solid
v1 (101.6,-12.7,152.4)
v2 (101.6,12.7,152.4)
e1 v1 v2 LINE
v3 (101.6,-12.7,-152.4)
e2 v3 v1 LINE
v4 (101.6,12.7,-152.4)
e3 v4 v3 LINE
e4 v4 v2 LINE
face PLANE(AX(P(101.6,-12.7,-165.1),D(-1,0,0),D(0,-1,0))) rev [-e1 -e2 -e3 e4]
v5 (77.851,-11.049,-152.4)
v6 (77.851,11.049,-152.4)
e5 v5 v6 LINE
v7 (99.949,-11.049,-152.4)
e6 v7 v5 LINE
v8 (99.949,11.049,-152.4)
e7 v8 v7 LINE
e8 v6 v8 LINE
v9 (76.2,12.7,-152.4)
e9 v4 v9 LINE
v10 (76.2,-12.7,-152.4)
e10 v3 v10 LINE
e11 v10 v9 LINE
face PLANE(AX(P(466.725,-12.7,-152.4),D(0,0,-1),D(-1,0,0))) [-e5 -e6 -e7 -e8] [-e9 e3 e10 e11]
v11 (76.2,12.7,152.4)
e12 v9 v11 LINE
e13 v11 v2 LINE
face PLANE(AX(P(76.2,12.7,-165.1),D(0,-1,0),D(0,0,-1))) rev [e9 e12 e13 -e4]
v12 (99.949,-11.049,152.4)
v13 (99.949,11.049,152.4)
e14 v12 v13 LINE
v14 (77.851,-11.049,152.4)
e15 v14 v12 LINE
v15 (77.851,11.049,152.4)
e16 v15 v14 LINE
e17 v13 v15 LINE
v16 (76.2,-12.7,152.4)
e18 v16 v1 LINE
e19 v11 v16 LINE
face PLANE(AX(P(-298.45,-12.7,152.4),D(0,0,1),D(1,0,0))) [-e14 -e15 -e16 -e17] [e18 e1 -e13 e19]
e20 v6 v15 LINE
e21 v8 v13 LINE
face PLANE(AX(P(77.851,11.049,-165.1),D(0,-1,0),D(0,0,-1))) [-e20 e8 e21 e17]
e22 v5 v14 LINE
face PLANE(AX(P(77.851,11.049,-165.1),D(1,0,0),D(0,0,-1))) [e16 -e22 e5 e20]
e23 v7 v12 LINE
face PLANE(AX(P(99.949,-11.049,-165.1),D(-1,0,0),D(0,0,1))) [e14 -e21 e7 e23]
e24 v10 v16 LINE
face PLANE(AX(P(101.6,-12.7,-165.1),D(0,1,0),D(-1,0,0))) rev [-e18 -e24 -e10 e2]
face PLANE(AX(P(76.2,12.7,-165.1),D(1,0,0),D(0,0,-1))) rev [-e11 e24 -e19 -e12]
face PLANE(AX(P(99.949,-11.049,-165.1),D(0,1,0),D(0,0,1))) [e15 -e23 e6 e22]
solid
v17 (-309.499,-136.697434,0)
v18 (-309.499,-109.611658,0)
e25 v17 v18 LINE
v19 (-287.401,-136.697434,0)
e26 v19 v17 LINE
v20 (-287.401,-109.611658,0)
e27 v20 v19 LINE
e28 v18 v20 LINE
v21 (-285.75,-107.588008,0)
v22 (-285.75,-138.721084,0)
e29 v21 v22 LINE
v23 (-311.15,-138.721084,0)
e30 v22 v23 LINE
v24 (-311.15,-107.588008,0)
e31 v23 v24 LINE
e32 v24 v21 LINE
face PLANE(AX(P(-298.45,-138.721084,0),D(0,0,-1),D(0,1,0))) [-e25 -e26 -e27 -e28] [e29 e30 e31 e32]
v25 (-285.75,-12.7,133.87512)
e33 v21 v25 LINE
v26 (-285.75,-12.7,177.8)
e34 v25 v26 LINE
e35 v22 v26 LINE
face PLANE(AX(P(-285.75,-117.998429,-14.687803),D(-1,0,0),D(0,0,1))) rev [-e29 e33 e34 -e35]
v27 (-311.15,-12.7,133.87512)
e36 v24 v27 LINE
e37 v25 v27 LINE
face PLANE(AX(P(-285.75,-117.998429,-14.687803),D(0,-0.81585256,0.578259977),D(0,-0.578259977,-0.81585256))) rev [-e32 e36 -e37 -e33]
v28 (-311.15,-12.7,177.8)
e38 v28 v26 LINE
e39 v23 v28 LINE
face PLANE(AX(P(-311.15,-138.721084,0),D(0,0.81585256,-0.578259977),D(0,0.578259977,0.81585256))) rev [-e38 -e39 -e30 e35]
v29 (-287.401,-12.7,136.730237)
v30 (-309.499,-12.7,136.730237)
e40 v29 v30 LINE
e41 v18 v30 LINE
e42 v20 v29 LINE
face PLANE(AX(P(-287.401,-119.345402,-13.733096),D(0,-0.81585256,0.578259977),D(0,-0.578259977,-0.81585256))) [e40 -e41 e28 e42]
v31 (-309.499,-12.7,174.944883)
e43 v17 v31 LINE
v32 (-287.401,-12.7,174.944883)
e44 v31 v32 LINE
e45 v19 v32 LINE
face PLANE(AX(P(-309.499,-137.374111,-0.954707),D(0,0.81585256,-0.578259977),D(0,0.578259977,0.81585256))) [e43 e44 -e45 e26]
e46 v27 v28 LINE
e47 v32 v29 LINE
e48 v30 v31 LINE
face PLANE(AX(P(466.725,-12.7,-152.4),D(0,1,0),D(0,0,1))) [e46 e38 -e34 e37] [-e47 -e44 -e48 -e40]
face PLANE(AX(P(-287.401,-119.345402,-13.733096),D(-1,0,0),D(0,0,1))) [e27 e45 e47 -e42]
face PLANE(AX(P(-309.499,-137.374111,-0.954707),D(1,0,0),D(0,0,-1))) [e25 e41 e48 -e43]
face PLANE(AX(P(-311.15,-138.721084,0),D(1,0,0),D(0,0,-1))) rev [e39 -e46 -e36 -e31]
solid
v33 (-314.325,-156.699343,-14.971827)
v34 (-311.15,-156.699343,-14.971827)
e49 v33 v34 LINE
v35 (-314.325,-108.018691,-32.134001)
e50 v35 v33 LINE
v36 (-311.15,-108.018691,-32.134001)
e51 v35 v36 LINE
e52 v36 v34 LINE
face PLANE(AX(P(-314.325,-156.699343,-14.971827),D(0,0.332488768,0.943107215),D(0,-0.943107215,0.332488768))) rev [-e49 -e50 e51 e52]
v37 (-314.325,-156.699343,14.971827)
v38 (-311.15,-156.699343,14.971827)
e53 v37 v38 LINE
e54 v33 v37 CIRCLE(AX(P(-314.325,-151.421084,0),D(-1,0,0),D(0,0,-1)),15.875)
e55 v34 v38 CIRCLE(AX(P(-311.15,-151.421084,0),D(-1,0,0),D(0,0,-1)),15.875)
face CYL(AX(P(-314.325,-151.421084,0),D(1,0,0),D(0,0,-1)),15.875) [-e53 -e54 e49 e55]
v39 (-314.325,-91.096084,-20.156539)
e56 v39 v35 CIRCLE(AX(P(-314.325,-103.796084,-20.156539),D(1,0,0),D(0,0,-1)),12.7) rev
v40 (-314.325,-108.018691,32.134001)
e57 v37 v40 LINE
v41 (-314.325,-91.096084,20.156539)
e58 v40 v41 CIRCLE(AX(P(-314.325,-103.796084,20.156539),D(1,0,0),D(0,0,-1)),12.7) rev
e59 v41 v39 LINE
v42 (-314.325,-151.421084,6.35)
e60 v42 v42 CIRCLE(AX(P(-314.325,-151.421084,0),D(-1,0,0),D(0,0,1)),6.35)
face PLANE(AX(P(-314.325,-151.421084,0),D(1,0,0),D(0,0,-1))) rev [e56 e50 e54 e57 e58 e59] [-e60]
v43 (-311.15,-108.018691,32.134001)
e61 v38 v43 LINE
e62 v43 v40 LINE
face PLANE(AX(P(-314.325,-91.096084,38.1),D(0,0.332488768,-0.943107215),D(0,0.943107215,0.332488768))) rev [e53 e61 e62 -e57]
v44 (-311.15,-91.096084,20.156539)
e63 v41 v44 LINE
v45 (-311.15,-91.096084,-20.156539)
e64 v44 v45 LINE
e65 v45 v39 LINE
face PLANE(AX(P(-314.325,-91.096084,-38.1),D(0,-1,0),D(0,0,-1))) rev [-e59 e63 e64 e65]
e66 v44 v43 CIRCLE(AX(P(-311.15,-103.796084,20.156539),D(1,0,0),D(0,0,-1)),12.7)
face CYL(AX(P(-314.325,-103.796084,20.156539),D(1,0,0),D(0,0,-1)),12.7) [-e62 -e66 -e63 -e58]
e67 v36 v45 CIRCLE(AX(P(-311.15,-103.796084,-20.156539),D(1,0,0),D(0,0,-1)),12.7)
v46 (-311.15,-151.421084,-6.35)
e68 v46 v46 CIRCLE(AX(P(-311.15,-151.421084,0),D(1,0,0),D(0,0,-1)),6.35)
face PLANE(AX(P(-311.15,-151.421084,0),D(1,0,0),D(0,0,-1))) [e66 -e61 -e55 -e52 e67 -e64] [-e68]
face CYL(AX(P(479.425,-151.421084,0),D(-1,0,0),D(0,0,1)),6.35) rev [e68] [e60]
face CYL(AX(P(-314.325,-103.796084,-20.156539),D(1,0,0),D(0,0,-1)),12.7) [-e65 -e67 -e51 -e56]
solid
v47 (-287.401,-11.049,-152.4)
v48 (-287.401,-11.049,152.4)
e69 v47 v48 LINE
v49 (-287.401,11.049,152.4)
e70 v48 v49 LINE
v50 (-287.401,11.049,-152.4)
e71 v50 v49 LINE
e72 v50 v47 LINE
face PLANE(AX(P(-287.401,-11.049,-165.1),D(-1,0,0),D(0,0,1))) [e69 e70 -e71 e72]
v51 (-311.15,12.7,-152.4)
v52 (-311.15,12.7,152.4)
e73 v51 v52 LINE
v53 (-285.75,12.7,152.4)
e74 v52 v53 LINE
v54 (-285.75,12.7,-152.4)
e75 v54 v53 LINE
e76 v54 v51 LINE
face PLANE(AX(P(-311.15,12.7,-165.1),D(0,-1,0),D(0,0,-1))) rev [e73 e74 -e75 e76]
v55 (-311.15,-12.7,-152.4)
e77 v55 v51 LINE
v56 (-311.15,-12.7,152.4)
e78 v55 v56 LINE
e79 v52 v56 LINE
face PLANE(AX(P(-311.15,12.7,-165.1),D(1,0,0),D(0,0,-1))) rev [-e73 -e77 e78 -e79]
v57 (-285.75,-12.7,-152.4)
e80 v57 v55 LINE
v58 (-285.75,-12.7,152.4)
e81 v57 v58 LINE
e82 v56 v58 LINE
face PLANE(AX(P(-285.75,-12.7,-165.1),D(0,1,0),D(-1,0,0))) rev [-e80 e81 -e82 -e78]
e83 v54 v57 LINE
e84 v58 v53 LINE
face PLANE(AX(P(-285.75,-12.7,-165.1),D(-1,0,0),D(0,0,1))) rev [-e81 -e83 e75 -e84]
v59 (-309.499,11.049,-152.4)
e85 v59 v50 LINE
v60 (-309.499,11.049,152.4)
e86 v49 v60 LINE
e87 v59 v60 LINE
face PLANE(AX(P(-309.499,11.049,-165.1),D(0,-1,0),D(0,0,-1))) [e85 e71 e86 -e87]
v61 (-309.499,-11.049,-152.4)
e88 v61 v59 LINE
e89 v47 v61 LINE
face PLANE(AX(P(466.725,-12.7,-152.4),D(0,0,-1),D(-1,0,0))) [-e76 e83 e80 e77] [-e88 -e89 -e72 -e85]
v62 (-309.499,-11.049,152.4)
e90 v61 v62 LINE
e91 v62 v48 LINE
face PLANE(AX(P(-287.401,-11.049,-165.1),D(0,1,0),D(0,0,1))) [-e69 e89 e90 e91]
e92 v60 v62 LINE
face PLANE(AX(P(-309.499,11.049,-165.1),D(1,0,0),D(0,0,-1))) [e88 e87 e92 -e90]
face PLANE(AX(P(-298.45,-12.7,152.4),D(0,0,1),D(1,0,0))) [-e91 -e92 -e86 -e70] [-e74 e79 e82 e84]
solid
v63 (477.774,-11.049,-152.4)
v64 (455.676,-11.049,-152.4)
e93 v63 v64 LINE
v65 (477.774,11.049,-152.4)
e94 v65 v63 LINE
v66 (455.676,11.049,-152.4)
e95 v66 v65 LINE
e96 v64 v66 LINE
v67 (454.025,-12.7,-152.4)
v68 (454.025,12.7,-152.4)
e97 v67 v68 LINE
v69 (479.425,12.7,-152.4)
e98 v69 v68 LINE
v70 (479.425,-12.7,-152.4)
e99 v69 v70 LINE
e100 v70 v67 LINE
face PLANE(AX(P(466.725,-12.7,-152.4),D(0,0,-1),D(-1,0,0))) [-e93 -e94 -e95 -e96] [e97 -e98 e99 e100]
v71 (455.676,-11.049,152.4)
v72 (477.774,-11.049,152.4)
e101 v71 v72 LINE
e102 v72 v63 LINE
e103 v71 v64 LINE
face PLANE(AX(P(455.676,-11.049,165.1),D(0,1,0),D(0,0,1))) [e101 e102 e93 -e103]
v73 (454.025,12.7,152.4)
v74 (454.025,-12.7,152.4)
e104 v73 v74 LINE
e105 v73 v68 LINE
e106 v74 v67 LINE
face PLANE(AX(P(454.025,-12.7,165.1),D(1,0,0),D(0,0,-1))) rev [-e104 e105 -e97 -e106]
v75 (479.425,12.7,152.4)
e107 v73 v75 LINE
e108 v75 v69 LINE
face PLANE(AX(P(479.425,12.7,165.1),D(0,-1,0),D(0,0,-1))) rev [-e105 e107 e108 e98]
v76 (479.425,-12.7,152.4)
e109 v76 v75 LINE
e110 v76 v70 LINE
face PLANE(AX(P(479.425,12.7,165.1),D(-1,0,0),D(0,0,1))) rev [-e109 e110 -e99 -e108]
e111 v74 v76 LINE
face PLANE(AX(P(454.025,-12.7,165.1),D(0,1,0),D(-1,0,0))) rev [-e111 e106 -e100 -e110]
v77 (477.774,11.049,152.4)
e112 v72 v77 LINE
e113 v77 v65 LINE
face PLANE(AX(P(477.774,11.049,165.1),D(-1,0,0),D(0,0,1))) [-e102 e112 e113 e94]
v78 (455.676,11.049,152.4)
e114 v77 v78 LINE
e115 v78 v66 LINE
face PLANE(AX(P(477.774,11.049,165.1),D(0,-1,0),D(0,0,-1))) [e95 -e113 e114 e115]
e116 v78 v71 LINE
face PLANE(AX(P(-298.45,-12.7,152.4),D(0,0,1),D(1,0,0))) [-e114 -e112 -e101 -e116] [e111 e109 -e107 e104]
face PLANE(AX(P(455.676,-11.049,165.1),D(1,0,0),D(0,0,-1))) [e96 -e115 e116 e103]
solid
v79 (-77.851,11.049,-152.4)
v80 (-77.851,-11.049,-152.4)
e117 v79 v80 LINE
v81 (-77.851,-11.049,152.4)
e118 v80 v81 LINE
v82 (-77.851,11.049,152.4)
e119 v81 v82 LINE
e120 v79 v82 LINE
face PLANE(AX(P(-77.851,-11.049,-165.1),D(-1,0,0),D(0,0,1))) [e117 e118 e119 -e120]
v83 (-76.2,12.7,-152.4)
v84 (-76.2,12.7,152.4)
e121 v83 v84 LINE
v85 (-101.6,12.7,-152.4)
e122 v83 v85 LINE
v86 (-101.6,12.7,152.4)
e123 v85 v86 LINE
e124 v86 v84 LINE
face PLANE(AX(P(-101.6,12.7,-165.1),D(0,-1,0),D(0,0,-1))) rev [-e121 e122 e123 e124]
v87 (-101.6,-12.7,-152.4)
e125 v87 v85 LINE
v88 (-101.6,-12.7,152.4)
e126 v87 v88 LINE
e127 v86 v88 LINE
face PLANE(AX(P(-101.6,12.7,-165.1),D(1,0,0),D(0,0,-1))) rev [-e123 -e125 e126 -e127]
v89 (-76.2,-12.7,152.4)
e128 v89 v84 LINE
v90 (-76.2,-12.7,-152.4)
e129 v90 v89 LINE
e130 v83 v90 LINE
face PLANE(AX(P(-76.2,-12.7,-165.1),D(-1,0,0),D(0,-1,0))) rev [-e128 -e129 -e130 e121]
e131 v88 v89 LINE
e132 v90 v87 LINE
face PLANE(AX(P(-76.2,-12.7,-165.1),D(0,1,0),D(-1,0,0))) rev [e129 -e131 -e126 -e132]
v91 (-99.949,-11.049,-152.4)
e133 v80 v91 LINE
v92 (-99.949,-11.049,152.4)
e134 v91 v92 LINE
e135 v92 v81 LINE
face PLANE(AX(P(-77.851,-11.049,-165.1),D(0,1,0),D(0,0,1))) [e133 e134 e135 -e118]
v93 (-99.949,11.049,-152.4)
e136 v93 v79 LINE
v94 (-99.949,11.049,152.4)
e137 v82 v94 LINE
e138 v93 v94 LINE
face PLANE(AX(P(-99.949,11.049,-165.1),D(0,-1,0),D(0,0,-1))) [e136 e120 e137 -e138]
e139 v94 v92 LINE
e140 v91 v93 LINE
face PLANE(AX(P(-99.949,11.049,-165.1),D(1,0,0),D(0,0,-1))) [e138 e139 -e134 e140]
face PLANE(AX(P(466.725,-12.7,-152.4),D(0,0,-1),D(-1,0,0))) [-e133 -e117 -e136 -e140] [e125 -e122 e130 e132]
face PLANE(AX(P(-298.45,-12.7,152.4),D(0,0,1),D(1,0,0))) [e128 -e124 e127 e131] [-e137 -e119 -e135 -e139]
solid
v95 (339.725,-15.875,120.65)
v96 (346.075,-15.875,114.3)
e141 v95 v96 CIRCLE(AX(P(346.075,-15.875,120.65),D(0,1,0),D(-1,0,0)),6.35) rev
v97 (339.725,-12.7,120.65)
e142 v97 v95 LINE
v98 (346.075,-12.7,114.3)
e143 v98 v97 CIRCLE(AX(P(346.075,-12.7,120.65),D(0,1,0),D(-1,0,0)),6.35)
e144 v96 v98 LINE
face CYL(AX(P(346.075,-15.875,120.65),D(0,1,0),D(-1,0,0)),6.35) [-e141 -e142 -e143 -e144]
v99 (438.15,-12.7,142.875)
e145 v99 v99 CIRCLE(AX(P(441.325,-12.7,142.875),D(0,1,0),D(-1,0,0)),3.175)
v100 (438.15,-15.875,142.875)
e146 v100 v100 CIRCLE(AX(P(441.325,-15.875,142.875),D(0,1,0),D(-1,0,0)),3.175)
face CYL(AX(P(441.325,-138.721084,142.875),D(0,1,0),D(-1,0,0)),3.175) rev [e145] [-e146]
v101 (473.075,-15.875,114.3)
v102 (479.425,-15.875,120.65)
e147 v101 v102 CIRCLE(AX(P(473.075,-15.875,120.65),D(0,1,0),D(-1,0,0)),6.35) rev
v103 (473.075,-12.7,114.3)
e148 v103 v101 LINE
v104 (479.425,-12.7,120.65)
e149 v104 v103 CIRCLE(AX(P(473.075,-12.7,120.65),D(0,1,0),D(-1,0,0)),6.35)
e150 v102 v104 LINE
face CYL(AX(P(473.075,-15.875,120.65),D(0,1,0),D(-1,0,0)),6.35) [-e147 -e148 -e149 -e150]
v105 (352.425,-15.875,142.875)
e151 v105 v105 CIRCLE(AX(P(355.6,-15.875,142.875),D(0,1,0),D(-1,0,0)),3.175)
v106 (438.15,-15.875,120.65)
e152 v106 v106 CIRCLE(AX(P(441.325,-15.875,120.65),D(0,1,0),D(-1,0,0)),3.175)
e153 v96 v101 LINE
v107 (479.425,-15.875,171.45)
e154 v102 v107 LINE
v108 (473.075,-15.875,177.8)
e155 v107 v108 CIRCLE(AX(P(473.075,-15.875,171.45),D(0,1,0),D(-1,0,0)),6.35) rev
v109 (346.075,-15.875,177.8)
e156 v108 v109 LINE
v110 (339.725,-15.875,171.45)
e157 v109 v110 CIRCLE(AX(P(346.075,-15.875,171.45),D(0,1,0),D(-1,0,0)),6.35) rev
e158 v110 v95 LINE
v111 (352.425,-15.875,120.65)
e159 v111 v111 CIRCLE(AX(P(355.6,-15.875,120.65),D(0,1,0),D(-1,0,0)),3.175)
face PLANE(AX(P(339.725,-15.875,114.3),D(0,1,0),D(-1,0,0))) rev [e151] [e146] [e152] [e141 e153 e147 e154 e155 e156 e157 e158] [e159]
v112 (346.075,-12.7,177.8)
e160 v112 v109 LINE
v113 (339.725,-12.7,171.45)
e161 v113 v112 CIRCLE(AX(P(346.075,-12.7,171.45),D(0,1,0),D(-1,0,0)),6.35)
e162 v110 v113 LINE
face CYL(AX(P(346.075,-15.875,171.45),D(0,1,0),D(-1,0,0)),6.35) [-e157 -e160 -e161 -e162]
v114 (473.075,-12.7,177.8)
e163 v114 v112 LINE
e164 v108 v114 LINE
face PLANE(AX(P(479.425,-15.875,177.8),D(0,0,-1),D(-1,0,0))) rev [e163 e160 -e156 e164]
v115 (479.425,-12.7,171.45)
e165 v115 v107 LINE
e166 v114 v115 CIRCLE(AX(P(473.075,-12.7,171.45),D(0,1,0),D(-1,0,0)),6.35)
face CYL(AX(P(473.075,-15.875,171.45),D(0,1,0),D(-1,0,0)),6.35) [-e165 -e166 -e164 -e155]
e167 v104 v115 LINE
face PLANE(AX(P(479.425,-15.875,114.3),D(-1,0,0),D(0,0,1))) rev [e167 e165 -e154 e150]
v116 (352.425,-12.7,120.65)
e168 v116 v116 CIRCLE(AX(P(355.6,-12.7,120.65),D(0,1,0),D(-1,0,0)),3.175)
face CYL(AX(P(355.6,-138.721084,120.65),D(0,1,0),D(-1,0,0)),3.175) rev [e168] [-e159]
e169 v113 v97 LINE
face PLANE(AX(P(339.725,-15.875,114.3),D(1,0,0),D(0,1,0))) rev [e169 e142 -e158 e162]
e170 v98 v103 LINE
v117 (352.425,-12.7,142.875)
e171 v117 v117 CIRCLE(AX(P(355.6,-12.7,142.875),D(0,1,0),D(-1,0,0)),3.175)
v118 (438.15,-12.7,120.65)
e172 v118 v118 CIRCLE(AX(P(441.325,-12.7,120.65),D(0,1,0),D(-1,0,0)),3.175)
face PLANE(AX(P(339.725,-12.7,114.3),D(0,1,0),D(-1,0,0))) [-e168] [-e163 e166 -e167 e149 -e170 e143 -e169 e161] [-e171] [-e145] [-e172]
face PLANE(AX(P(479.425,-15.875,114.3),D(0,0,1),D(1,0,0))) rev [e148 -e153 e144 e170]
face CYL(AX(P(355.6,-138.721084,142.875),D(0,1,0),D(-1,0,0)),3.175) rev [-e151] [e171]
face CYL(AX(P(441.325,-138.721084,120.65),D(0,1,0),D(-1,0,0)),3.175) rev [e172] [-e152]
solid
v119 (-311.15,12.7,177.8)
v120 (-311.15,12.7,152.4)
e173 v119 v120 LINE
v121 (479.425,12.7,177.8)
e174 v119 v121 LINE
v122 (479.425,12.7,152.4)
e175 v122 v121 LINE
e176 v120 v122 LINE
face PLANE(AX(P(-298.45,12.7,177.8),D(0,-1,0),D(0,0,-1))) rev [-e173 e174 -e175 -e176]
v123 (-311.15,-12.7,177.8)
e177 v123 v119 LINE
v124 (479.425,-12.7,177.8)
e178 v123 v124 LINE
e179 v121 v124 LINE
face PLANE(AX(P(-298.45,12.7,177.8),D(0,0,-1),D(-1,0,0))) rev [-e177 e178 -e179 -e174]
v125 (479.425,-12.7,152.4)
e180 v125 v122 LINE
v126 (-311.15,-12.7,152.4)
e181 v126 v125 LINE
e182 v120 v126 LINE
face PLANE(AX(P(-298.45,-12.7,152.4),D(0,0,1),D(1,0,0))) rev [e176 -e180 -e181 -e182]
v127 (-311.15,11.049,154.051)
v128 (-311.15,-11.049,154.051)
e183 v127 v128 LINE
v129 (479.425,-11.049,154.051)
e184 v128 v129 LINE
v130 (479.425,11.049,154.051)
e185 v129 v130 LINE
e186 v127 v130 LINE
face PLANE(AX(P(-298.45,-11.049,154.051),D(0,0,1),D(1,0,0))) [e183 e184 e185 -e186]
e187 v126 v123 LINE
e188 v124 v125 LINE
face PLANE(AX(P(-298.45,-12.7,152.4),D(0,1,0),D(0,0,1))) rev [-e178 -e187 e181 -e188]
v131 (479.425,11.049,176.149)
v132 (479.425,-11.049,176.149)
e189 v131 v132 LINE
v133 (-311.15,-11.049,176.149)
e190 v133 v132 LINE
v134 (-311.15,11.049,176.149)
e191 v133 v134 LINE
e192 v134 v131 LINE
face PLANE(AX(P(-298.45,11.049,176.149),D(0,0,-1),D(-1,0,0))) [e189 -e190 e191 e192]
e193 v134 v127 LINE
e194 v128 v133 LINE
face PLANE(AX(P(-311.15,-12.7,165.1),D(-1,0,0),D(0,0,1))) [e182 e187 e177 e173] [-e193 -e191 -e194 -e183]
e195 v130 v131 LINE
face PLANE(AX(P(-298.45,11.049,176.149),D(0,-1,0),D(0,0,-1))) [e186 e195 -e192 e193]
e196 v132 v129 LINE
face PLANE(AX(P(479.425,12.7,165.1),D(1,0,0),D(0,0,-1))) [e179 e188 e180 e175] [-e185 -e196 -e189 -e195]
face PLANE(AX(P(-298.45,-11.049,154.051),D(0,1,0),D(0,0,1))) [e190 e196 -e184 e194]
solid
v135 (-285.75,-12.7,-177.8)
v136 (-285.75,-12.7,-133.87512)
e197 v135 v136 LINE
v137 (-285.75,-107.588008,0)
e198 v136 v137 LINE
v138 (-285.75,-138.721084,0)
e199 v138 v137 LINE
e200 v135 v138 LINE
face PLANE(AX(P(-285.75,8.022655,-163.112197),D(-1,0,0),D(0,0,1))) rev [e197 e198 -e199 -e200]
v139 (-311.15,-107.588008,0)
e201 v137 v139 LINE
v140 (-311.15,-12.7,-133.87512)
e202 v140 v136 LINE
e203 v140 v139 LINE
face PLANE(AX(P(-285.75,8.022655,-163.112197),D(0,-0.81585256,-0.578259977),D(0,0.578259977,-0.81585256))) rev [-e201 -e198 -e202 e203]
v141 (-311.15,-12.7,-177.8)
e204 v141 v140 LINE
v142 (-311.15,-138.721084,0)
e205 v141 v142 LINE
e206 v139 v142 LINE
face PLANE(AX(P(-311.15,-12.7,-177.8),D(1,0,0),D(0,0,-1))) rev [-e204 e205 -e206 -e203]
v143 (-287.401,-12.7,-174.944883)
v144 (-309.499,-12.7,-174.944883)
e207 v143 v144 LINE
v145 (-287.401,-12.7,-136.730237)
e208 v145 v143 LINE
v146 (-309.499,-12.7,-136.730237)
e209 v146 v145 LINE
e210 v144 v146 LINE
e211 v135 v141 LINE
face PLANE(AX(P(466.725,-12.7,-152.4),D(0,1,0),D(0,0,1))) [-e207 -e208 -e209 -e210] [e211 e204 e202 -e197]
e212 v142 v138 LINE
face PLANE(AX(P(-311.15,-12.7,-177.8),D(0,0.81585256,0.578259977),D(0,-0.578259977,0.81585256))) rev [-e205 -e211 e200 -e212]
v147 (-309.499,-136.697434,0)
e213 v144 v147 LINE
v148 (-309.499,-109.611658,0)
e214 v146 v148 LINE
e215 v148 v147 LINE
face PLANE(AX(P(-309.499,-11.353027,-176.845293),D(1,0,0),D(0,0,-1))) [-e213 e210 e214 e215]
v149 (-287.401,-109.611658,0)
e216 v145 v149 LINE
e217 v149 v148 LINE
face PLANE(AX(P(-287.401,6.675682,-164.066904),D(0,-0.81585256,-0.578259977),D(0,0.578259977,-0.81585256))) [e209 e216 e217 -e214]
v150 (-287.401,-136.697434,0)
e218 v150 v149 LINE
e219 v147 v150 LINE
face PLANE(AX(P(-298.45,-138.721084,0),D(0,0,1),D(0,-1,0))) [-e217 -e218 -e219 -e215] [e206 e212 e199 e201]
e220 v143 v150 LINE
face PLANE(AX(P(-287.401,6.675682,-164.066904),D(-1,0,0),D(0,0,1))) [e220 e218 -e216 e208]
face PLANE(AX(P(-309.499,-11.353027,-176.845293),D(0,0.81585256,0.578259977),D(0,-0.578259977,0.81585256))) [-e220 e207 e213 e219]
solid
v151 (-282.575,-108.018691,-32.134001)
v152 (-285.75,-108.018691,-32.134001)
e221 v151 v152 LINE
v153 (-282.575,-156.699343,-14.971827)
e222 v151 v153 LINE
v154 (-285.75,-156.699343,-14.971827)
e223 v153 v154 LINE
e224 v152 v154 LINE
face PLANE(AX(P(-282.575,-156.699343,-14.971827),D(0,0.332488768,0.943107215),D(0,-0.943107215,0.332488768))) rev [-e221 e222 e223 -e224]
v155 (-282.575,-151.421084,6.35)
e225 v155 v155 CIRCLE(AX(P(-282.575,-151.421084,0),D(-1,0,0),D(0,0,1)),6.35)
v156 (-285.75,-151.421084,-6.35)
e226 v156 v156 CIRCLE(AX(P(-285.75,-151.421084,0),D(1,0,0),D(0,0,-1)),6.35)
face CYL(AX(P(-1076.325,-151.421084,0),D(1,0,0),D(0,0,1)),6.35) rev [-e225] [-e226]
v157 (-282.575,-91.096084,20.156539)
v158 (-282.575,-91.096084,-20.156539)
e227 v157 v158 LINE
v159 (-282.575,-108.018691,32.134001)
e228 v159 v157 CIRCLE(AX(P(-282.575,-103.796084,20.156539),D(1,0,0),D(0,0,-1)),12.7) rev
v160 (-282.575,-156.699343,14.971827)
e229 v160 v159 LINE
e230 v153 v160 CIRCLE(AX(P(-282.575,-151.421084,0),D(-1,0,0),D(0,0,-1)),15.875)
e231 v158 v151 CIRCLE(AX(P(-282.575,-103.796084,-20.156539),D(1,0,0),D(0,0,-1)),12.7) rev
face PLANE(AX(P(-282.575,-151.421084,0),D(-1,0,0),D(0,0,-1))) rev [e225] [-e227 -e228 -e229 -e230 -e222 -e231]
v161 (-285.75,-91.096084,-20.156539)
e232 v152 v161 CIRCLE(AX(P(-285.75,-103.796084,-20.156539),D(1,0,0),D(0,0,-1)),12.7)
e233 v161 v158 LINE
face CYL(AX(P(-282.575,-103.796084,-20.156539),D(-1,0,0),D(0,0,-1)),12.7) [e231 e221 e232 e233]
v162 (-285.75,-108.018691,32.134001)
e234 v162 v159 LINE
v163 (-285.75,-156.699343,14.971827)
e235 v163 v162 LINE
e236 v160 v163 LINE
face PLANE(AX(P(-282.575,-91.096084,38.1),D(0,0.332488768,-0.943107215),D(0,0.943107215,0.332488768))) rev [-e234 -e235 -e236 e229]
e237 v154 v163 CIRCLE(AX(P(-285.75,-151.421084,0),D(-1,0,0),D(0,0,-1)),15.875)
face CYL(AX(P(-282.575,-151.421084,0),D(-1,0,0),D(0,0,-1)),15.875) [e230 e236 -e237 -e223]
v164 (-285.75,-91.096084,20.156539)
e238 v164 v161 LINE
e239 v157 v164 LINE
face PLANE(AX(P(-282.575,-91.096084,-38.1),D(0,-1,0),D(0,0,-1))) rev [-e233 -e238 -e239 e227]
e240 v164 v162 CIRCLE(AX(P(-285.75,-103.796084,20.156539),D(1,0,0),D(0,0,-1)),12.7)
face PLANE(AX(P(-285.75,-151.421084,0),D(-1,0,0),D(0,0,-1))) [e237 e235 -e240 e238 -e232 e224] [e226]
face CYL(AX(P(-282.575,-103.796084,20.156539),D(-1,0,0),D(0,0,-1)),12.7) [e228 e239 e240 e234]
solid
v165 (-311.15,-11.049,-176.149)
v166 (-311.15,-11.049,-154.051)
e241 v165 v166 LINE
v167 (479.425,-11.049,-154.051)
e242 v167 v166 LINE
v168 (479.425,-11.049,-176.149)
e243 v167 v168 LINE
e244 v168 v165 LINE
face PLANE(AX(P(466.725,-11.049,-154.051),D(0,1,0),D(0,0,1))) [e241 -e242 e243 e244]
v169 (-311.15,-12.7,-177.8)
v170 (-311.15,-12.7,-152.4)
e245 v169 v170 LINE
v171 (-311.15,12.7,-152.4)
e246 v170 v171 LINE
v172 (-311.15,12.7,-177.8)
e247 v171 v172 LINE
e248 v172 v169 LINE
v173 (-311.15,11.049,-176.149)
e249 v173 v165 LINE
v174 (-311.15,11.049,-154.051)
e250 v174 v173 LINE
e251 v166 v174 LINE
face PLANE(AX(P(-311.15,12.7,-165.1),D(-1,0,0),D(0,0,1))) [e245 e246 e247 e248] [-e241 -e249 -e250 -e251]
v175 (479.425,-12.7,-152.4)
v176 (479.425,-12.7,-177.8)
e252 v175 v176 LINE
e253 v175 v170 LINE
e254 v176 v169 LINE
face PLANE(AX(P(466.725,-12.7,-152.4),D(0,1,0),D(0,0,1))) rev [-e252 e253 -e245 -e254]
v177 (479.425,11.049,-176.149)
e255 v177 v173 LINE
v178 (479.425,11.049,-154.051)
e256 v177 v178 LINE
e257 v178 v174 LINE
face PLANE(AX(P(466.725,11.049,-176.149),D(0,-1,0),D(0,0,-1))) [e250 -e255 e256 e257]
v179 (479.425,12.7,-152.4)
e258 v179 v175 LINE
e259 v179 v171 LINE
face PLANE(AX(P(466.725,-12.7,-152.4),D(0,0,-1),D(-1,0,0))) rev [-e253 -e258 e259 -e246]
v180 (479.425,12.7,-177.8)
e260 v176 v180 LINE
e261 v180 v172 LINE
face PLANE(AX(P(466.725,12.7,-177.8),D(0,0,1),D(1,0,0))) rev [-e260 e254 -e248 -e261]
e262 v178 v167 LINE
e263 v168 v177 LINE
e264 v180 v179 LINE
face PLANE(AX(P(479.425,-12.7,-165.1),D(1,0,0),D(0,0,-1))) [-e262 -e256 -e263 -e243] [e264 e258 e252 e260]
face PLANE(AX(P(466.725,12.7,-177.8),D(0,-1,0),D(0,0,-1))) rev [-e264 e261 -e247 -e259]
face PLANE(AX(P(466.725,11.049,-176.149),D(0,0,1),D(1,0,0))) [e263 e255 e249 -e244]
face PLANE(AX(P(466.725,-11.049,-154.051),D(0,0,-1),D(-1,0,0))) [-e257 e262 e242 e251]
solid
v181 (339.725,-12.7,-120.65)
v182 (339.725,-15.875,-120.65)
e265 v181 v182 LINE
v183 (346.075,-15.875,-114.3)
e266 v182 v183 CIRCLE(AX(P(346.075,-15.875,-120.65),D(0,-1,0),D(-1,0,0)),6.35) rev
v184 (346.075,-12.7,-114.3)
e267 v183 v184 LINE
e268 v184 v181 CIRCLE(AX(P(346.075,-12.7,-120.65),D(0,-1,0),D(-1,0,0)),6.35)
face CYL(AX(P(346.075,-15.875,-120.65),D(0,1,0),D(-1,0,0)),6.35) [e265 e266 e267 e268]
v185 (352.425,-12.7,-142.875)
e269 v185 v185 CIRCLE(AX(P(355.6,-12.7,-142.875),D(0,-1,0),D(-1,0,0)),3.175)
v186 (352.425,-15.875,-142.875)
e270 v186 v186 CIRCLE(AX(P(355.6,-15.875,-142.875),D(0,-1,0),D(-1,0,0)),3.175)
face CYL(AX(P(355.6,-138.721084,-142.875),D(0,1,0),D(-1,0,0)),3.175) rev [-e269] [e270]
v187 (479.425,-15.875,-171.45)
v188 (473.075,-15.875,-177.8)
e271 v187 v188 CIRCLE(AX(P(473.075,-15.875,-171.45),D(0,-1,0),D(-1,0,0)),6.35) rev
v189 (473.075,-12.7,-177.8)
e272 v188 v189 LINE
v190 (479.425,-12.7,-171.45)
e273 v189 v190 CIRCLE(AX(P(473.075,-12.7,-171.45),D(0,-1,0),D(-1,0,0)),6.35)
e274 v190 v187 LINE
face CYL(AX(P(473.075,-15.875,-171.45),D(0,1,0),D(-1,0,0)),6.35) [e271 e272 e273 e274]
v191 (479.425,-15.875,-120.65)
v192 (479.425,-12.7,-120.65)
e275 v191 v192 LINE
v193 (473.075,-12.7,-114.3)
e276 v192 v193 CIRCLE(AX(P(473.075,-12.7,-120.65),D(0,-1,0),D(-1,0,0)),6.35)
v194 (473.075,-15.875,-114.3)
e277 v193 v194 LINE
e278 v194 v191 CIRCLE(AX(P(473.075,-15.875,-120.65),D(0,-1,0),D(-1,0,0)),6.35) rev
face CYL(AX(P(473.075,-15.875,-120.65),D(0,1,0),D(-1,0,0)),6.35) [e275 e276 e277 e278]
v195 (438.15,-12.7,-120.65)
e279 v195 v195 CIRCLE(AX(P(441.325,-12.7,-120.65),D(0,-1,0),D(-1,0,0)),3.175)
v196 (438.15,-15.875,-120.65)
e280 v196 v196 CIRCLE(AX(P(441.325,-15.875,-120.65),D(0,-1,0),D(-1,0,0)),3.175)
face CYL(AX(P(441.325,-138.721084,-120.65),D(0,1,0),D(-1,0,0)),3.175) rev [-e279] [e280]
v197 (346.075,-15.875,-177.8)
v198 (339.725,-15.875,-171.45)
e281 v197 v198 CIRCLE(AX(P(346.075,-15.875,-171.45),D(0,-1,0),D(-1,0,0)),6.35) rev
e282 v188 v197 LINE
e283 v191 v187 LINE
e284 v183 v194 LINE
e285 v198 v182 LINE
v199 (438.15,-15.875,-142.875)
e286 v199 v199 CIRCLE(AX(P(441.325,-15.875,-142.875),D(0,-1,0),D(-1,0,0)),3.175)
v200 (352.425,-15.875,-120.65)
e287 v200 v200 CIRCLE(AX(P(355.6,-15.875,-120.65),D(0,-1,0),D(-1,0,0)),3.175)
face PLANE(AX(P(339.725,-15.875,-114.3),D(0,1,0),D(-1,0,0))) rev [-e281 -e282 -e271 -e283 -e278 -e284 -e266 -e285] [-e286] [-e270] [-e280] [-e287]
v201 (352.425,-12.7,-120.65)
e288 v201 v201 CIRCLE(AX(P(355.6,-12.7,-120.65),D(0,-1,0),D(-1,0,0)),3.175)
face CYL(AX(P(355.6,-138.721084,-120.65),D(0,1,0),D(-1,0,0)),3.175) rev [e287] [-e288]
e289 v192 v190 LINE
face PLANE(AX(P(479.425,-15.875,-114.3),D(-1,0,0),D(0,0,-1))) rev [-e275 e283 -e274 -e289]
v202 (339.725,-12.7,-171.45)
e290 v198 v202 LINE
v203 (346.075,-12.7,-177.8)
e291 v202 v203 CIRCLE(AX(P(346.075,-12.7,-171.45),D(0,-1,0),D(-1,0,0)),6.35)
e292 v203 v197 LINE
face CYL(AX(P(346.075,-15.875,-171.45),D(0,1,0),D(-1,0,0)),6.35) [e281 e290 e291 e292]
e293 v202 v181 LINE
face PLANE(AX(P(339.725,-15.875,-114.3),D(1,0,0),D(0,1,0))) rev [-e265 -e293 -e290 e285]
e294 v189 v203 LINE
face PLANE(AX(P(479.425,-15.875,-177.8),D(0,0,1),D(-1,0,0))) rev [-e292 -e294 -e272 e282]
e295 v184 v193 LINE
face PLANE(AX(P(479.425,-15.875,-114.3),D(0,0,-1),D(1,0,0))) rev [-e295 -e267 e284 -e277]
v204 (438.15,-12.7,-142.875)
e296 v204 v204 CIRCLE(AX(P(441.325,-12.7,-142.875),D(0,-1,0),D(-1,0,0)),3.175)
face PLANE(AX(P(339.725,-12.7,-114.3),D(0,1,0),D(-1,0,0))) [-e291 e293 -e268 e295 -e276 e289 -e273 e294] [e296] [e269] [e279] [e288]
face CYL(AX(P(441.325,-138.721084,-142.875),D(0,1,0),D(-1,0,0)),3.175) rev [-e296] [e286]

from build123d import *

# Parameters (mm, degrees)
BED_START                       = -12.7
BED_MEMBERS_OUTLINE_W           = 1.651
BED_MEMBERS_OUTLINE_H           = 304.8
BED_MEMBERS_DEPTH               = 25.4
BED_MEMBERS_2_OUTLINE_W         = 22.098
BED_MEMBERS_2_OUTLINE_H         = 304.8
BED_MEMBERS_2_DEPTH             = 1.651
BED_START_2                     = 11.049
BED_MEMBERS_3_OUTLINE_W         = 22.098
BED_MEMBERS_3_OUTLINE_H         = 304.8
BED_MEMBERS_3_DEPTH             = 1.651
BED_START_3                     = -177.8
BED_MEMBERS_4_OUTLINE_W         = 790.575
BED_MEMBERS_4_OUTLINE_H         = 1.651
BED_MEMBERS_4_DEPTH             = 25.4
BED_MEMBERS_5_OUTLINE_W         = 790.575
BED_MEMBERS_5_OUTLINE_H         = 22.098
BED_MEMBERS_5_DEPTH             = 1.651
BED_START_4                     = -154.051
BED_MEMBERS_6_OUTLINE_W         = 790.575
BED_MEMBERS_6_OUTLINE_H         = 22.098
BED_MEMBERS_6_DEPTH             = 1.651
BED_START_5                     = 152.4
BED_MEMBERS_7_OUTLINE_W         = 790.575
BED_MEMBERS_7_OUTLINE_H         = 1.651
BED_MEMBERS_7_DEPTH             = 25.4
BED_MEMBERS_8_OUTLINE_W         = 790.575
BED_MEMBERS_8_OUTLINE_H         = 22.098
BED_MEMBERS_8_DEPTH             = 1.651
BED_START_6                     = 176.149
BED_MEMBERS_9_OUTLINE_W         = 790.575
BED_MEMBERS_9_OUTLINE_H         = 22.098
BED_MEMBERS_9_DEPTH             = 1.651
BED_MEMBERS_10_OUTLINE_W        = 1.651
BED_MEMBERS_10_OUTLINE_H        = 304.8
BED_MEMBERS_10_DEPTH            = 25.4
BED_MEMBERS_11_OUTLINE_W        = 22.098
BED_MEMBERS_11_OUTLINE_H        = 304.8
BED_MEMBERS_11_DEPTH            = 1.651
BED_MEMBERS_12_OUTLINE_W        = 22.098
BED_MEMBERS_12_OUTLINE_H        = 304.8
BED_MEMBERS_12_DEPTH            = 1.651
SKETCH1_W                       = 25.4
SKETCH1_H                       = 25.4
SKETCH1_W_2                     = 22.098
SKETCH1_H_2                     = 22.098
BED_CROSSMEMBERS_DEPTH          = 330.2
SKETCH1_ON_SEGMENT_2_W          = 25.4
SKETCH1_ON_SEGMENT_2_H          = 25.4
SKETCH1_ON_SEGMENT_2_W_2        = 22.098
SKETCH1_ON_SEGMENT_2_H_2        = 22.098
BED_CROSSMEMBERS_2_DEPTH        = 330.2
SKETCH132_W                     = 25.4
SKETCH132_H                     = 25.4
SKETCH132_W_2                   = 22.098
SKETCH132_H_2                   = 22.098
REAR_LEG_MEMBERS_DEPTH          = 240.663092099
SKETCH132_ON_SEGMENT_2_W        = 25.4
SKETCH132_ON_SEGMENT_2_H        = 25.4
SKETCH132_ON_SEGMENT_2_W_2      = 22.098
SKETCH132_ON_SEGMENT_2_H_2      = 22.098
REAR_LEG_MEMBERS_2_DEPTH        = 240.663092099
SKETCH133_W                     = 139.7
SKETCH133_H                     = 63.5
FRONT_LEG_PLATE_DEPTH           = 3.175
FRONT_LEG_PLATE_FILLET_R        = 6.35
SKETCH136_R                     = 3.175
CUT_EXTRUDE1_DEPTH              = 527.633159095
REAR_SUSPENSION_PLATE_DEPTH     = 3.175
REAR_SUSPENSION_PLATE_FILLETS_R = 12.7
SKETCH135_R                     = 6.35
REAR_SUSPENSION_PIVOT_DEPTH     = 831.445592582
TRIM_EXTEND1_START              = -12.7
TRIM_EXTEND1_OUTLINE_W          = 25.4
TRIM_EXTEND1_OUTLINE_H          = 47
TRIM_EXTEND1_DEPTH              = 20.722655011
TRIM_EXTEND1_START_2            = -165.1
TRIM_EXTEND1_2_OUTLINE_W        = 25.4
TRIM_EXTEND1_2_OUTLINE_H        = 25.4
TRIM_EXTEND1_2_OUTLINE_W_2      = 22.098
TRIM_EXTEND1_2_OUTLINE_H_2      = 22.098
TRIM_EXTEND1_2_DEPTH            = 12.7
TRIM_EXTEND1_START_3            = 152.4
TRIM_EXTEND1_3_OUTLINE_W        = 25.4
TRIM_EXTEND1_3_OUTLINE_H        = 25.4
TRIM_EXTEND1_3_OUTLINE_W_2      = 22.098
TRIM_EXTEND1_3_OUTLINE_H_2      = 22.098
TRIM_EXTEND1_3_DEPTH            = 12.7
TRIM_EXTEND1_4_OUTLINE_W        = 25.4
TRIM_EXTEND1_4_OUTLINE_H        = 25.4
TRIM_EXTEND1_4_OUTLINE_W_2      = 22.098
TRIM_EXTEND1_4_OUTLINE_H_2      = 22.098
TRIM_EXTEND1_4_DEPTH            = 12.7
TRIM_EXTEND1_5_OUTLINE_W        = 25.4
TRIM_EXTEND1_5_OUTLINE_H        = 25.4
TRIM_EXTEND1_5_OUTLINE_W_2      = 22.098
TRIM_EXTEND1_5_OUTLINE_H_2      = 22.098
TRIM_EXTEND1_5_DEPTH            = 12.7
TRIM_EXTEND1_6_OUTLINE_W        = 25.4
TRIM_EXTEND1_6_OUTLINE_H        = 47
TRIM_EXTEND1_6_DEPTH            = 20.722655011


# Read off the part's stored shape, not the designer's step: Bed members, Trim/Extend1
with BuildPart() as part:
    # Bed members outline → Bed members (new body)
    with BuildSketch(Plane(origin=(0, 0, 0), x_dir=(1, 0, 0), z_dir=(0, 1, 0)).offset(BED_START)):
        with Locations((478.5995, 0)):
            Rectangle(BED_MEMBERS_OUTLINE_W, BED_MEMBERS_OUTLINE_H)
        with Locations((454.8505, 0)):
            Rectangle(BED_MEMBERS_OUTLINE_W, BED_MEMBERS_OUTLINE_H)
    extrude(amount=BED_MEMBERS_DEPTH)

    # Bed members 2 outline → Bed members 2 (add)
    with BuildSketch(Plane(origin=(0, 0, 0), x_dir=(1, 0, 0), z_dir=(0, 1, 0)).offset(BED_START)):
        with Locations((466.725, 0)):
            Rectangle(BED_MEMBERS_2_OUTLINE_W, BED_MEMBERS_2_OUTLINE_H)
    extrude(amount=BED_MEMBERS_2_DEPTH)

    # Bed members 3 outline → Bed members 3 (add)
    with BuildSketch(Plane(origin=(0, 0, 0), x_dir=(1, 0, 0), z_dir=(0, 1, 0)).offset(BED_START_2)):
        with Locations((466.725, 0)):
            Rectangle(BED_MEMBERS_3_OUTLINE_W, BED_MEMBERS_3_OUTLINE_H)
    extrude(amount=BED_MEMBERS_3_DEPTH)


with BuildPart() as body_2:
    # Bed members 4 outline → Bed members 4 (new body)
    with BuildSketch(Plane.XY.offset(BED_START_3)):
        with Locations((84.1375, 11.8745)):
            Rectangle(BED_MEMBERS_4_OUTLINE_W, BED_MEMBERS_4_OUTLINE_H)
        with Locations((84.1375, -11.8745)):
            Rectangle(BED_MEMBERS_4_OUTLINE_W, BED_MEMBERS_4_OUTLINE_H)
    extrude(amount=BED_MEMBERS_4_DEPTH)

    # Bed members 5 outline → Bed members 5 (add)
    with BuildSketch(Plane.XY.offset(BED_START_3)):
        with Locations((84.1375, 0)):
            Rectangle(BED_MEMBERS_5_OUTLINE_W, BED_MEMBERS_5_OUTLINE_H)
    extrude(amount=BED_MEMBERS_5_DEPTH)

    # Bed members 6 outline → Bed members 6 (add)
    with BuildSketch(Plane.XY.offset(BED_START_4)):
        with Locations((84.1375, 0)):
            Rectangle(BED_MEMBERS_6_OUTLINE_W, BED_MEMBERS_6_OUTLINE_H)
    extrude(amount=BED_MEMBERS_6_DEPTH)


with BuildPart() as body_3:
    # Bed members 7 outline → Bed members 7 (new body)
    with BuildSketch(Plane.XY.offset(BED_START_5)):
        with Locations((84.1375, 11.8745)):
            Rectangle(BED_MEMBERS_7_OUTLINE_W, BED_MEMBERS_7_OUTLINE_H)
        with Locations((84.1375, -11.8745)):
            Rectangle(BED_MEMBERS_7_OUTLINE_W, BED_MEMBERS_7_OUTLINE_H)
    extrude(amount=BED_MEMBERS_7_DEPTH)

    # Bed members 8 outline → Bed members 8 (add)
    with BuildSketch(Plane.XY.offset(BED_START_5)):
        with Locations((84.1375, 0)):
            Rectangle(BED_MEMBERS_8_OUTLINE_W, BED_MEMBERS_8_OUTLINE_H)
    extrude(amount=BED_MEMBERS_8_DEPTH)

    # Bed members 9 outline → Bed members 9 (add)
    with BuildSketch(Plane.XY.offset(BED_START_6)):
        with Locations((84.1375, 0)):
            Rectangle(BED_MEMBERS_9_OUTLINE_W, BED_MEMBERS_9_OUTLINE_H)
    extrude(amount=BED_MEMBERS_9_DEPTH)


with BuildPart() as body_4:
    # Bed members 10 outline → Bed members 10 (new body)
    with BuildSketch(Plane(origin=(0, 0, 0), x_dir=(1, 0, 0), z_dir=(0, 1, 0)).offset(BED_START)):
        with Locations((-310.3245, 0)):
            Rectangle(BED_MEMBERS_10_OUTLINE_W, BED_MEMBERS_10_OUTLINE_H)
        with Locations((-286.5755, 0)):
            Rectangle(BED_MEMBERS_10_OUTLINE_W, BED_MEMBERS_10_OUTLINE_H)
    extrude(amount=BED_MEMBERS_10_DEPTH)

    # Bed members 11 outline → Bed members 11 (add)
    with BuildSketch(Plane(origin=(0, 0, 0), x_dir=(1, 0, 0), z_dir=(0, 1, 0)).offset(BED_START)):
        with Locations((-298.45, 0)):
            Rectangle(BED_MEMBERS_11_OUTLINE_W, BED_MEMBERS_11_OUTLINE_H)
    extrude(amount=BED_MEMBERS_11_DEPTH)

    # Bed members 12 outline → Bed members 12 (add)
    with BuildSketch(Plane(origin=(0, 0, 0), x_dir=(1, 0, 0), z_dir=(0, 1, 0)).offset(BED_START_2)):
        with Locations((-298.45, 0)):
            Rectangle(BED_MEMBERS_12_OUTLINE_W, BED_MEMBERS_12_OUTLINE_H)
    extrude(amount=BED_MEMBERS_12_DEPTH)


with BuildPart() as body_5:
    # Sketch1 → Bed crossmembers (new body)
    with BuildSketch(Plane(origin=(88.9, 0, 165.1), x_dir=(-1, 0, 0), z_dir=(0, 0, -1))):
        Rectangle(SKETCH1_W, SKETCH1_H)
        Rectangle(SKETCH1_W_2, SKETCH1_H_2, mode=Mode.SUBTRACT)
    extrude(amount=BED_CROSSMEMBERS_DEPTH)

    # Trim_Extend1 2 outline → Trim_Extend1 2 (cut)
    with BuildSketch(Plane.XY.offset(TRIM_EXTEND1_START_2)):
        with Locations((88.9, 0)):
            Rectangle(TRIM_EXTEND1_2_OUTLINE_W, TRIM_EXTEND1_2_OUTLINE_H)
        with Locations((88.9, 0)):
            Rectangle(TRIM_EXTEND1_2_OUTLINE_W_2, TRIM_EXTEND1_2_OUTLINE_H_2, mode=Mode.SUBTRACT)
    extrude(amount=TRIM_EXTEND1_2_DEPTH, mode=Mode.SUBTRACT)

    # Trim_Extend1 3 outline → Trim_Extend1 3 (cut)
    with BuildSketch(Plane.XY.offset(TRIM_EXTEND1_START_3)):
        with Locations((88.9, 0)):
            Rectangle(TRIM_EXTEND1_3_OUTLINE_W, TRIM_EXTEND1_3_OUTLINE_H)
        with Locations((88.9, 0)):
            Rectangle(TRIM_EXTEND1_3_OUTLINE_W_2, TRIM_EXTEND1_3_OUTLINE_H_2, mode=Mode.SUBTRACT)
    extrude(amount=TRIM_EXTEND1_3_DEPTH, mode=Mode.SUBTRACT)


with BuildPart() as body_6:
    # Sketch1 on segment 2 (carried to segment 2) → Bed crossmembers 2 (new body)
    with BuildSketch(Plane(origin=(-88.9, 0, 165.1), x_dir=(-1, 0, 0), z_dir=(0, 0, -1))):
        Rectangle(SKETCH1_ON_SEGMENT_2_W, SKETCH1_ON_SEGMENT_2_H)
        Rectangle(SKETCH1_ON_SEGMENT_2_W_2, SKETCH1_ON_SEGMENT_2_H_2, mode=Mode.SUBTRACT)
    extrude(amount=BED_CROSSMEMBERS_2_DEPTH)

    # Trim_Extend1 4 outline → Trim_Extend1 4 (cut)
    with BuildSketch(Plane.XY.offset(TRIM_EXTEND1_START_2)):
        with Locations((-88.9, 0)):
            Rectangle(TRIM_EXTEND1_4_OUTLINE_W, TRIM_EXTEND1_4_OUTLINE_H)
        with Locations((-88.9, 0)):
            Rectangle(TRIM_EXTEND1_4_OUTLINE_W_2, TRIM_EXTEND1_4_OUTLINE_H_2, mode=Mode.SUBTRACT)
    extrude(amount=TRIM_EXTEND1_4_DEPTH, mode=Mode.SUBTRACT)

    # Trim_Extend1 5 outline → Trim_Extend1 5 (cut)
    with BuildSketch(Plane.XY.offset(TRIM_EXTEND1_START_3)):
        with Locations((-88.9, 0)):
            Rectangle(TRIM_EXTEND1_5_OUTLINE_W, TRIM_EXTEND1_5_OUTLINE_H)
        with Locations((-88.9, 0)):
            Rectangle(TRIM_EXTEND1_5_OUTLINE_W_2, TRIM_EXTEND1_5_OUTLINE_H_2, mode=Mode.SUBTRACT)
    extrude(amount=TRIM_EXTEND1_5_DEPTH, mode=Mode.SUBTRACT)


with BuildPart() as body_7:
    # Sketch132 → Rear leg members (new body)
    with BuildSketch(Plane(origin=(-298.45, -2.338672494, 170.45609829), x_dir=(0, 0.8158525595063999, -0.5782599771269463), z_dir=(0, -0.5782599771269463, -0.8158525595063999))):
        Rectangle(SKETCH132_W, SKETCH132_H)
        Rectangle(SKETCH132_W_2, SKETCH132_H_2, mode=Mode.SUBTRACT)
    extrude(amount=REAR_LEG_MEMBERS_DEPTH)

    # Rear leg members mitre 1
    split(bisect_by=Plane(origin=(-298.45, -138.721084, 0), x_dir=(0, -1, 0), z_dir=(0, 0, 1)), keep=Keep.TOP)

    # Trim/Extend1 outline → Trim/Extend1 (cut)
    with BuildSketch(Plane(origin=(0, 0, 0), x_dir=(1, 0, 0), z_dir=(0, 1, 0)).offset(TRIM_EXTEND1_START)):
        with Locations((-298.45, -155.5)):
            Rectangle(TRIM_EXTEND1_OUTLINE_W, TRIM_EXTEND1_OUTLINE_H)
    extrude(amount=TRIM_EXTEND1_DEPTH, mode=Mode.SUBTRACT)


with BuildPart() as body_8:
    # Sketch132 on segment 2 (carried to segment 2) → Rear leg members 2 (new body)
    with BuildSketch(Plane(origin=(-298.45, -141.504506626, 25.889501377), x_dir=(0, 0.81585256, 0.578259977), z_dir=(0, 0.578259977, -0.81585256))):
        Rectangle(SKETCH132_ON_SEGMENT_2_W, SKETCH132_ON_SEGMENT_2_H)
        Rectangle(SKETCH132_ON_SEGMENT_2_W_2, SKETCH132_ON_SEGMENT_2_H_2, mode=Mode.SUBTRACT)
    extrude(amount=REAR_LEG_MEMBERS_2_DEPTH)

    # Rear leg members 2 mitre 1
    split(bisect_by=Plane(origin=(-298.45, -138.721084, 0), x_dir=(0, 1, 0), z_dir=(0, 0, -1)), keep=Keep.TOP)

    # Trim_Extend1 6 outline → Trim_Extend1 6 (cut)
    with BuildSketch(Plane(origin=(0, 0, 0), x_dir=(1, 0, 0), z_dir=(0, 1, 0)).offset(TRIM_EXTEND1_START)):
        with Locations((-298.45, 155.5)):
            Rectangle(TRIM_EXTEND1_6_OUTLINE_W, TRIM_EXTEND1_6_OUTLINE_H)
    extrude(amount=TRIM_EXTEND1_6_DEPTH, mode=Mode.SUBTRACT)


with BuildPart() as body_9:
    # Sketch133 → Front leg plate (new body)
    with BuildSketch(Plane.XZ.offset(12.7)):
        with Locations((409.575, 146.05)):
            Rectangle(SKETCH133_W, SKETCH133_H)
    extrude(amount=FRONT_LEG_PLATE_DEPTH)

    # Front leg plate fillet
    front_leg_plate_fillet_edges = [body_9.edges().sort_by_distance(p)[0] for p in [
        (339.725, -14.2875, 114.3),
        (339.725, -14.2875, 177.8),
        (479.425, -14.2875, 177.8),
        (479.425, -14.2875, 114.3),
    ]]
    fillet(front_leg_plate_fillet_edges, radius=FRONT_LEG_PLATE_FILLET_R)

    # Sketch136 → Cut-Extrude1 (cut, through all)
    with BuildSketch(Plane(origin=(0, -12.7, 0), x_dir=(1, 0, 0), z_dir=(0, 1, 0))):
        with Locations(Location((355.6, -120.65, 0), (0, 0, 180))):
            Circle(SKETCH136_R)
        with Locations(Location((355.6, -142.875, 0), (0, 0, 180))):
            Circle(SKETCH136_R)
        with Locations(Location((441.325, -142.875, 0), (0, 0, 180))):
            Circle(SKETCH136_R)
        with Locations(Location((441.325, -120.65, 0), (0, 0, 180))):
            Circle(SKETCH136_R)
    extrude(amount=-CUT_EXTRUDE1_DEPTH, mode=Mode.SUBTRACT)


with BuildPart() as body_10:
    # Front leg plate mirror: mirrored copy
    add(body_9.part.mirror(Plane.XY))


with BuildPart() as body_11:
    # Sketch134 → Rear suspension plate (new body)
    with BuildSketch(Plane.ZY.offset(311.15)):
        with BuildLine():
            Line((-38.1, -91.096084), (38.1, -91.096084))
            Line((38.1, -91.096084), (14.971827042, -156.699343185))
            ThreePointArc((14.971827042, -156.699343185), (0, -167.296084), (-14.971827042, -156.699343185))
            Line((-14.971827042, -156.699343185), (-38.1, -91.096084))
        make_face()
    extrude(amount=REAR_SUSPENSION_PLATE_DEPTH)

    # Rear suspension plate fillets
    rear_suspension_plate_fillets_edges = [body_11.edges().sort_by_distance(p)[0] for p in [
        (-312.7375, -91.096084, -38.1),
        (-312.7375, -91.096084, 38.1),
    ]]
    fillet(rear_suspension_plate_fillets_edges, radius=REAR_SUSPENSION_PLATE_FILLETS_R)

    # Sketch135 → Rear suspension pivot (cut, through all)
    with BuildSketch(Plane.ZY.offset(314.325)):
        with Locations((0, -151.421084)):
            Circle(SKETCH135_R)
    extrude(amount=-REAR_SUSPENSION_PIVOT_DEPTH, mode=Mode.SUBTRACT)


with BuildPart() as body_12:
    # Rear suspension pivot mirror: mirrored copy
    add(body_11.part.mirror(Plane(origin=(-298.45, 0, 0), x_dir=(0, 0, 1), z_dir=(1, 0, 0))))


solid = Compound([part.part, body_2.part, body_3.part, body_4.part, body_5.part, body_6.part, body_7.part, body_8.part, body_9.part, body_10.part, body_11.part, body_12.part])
